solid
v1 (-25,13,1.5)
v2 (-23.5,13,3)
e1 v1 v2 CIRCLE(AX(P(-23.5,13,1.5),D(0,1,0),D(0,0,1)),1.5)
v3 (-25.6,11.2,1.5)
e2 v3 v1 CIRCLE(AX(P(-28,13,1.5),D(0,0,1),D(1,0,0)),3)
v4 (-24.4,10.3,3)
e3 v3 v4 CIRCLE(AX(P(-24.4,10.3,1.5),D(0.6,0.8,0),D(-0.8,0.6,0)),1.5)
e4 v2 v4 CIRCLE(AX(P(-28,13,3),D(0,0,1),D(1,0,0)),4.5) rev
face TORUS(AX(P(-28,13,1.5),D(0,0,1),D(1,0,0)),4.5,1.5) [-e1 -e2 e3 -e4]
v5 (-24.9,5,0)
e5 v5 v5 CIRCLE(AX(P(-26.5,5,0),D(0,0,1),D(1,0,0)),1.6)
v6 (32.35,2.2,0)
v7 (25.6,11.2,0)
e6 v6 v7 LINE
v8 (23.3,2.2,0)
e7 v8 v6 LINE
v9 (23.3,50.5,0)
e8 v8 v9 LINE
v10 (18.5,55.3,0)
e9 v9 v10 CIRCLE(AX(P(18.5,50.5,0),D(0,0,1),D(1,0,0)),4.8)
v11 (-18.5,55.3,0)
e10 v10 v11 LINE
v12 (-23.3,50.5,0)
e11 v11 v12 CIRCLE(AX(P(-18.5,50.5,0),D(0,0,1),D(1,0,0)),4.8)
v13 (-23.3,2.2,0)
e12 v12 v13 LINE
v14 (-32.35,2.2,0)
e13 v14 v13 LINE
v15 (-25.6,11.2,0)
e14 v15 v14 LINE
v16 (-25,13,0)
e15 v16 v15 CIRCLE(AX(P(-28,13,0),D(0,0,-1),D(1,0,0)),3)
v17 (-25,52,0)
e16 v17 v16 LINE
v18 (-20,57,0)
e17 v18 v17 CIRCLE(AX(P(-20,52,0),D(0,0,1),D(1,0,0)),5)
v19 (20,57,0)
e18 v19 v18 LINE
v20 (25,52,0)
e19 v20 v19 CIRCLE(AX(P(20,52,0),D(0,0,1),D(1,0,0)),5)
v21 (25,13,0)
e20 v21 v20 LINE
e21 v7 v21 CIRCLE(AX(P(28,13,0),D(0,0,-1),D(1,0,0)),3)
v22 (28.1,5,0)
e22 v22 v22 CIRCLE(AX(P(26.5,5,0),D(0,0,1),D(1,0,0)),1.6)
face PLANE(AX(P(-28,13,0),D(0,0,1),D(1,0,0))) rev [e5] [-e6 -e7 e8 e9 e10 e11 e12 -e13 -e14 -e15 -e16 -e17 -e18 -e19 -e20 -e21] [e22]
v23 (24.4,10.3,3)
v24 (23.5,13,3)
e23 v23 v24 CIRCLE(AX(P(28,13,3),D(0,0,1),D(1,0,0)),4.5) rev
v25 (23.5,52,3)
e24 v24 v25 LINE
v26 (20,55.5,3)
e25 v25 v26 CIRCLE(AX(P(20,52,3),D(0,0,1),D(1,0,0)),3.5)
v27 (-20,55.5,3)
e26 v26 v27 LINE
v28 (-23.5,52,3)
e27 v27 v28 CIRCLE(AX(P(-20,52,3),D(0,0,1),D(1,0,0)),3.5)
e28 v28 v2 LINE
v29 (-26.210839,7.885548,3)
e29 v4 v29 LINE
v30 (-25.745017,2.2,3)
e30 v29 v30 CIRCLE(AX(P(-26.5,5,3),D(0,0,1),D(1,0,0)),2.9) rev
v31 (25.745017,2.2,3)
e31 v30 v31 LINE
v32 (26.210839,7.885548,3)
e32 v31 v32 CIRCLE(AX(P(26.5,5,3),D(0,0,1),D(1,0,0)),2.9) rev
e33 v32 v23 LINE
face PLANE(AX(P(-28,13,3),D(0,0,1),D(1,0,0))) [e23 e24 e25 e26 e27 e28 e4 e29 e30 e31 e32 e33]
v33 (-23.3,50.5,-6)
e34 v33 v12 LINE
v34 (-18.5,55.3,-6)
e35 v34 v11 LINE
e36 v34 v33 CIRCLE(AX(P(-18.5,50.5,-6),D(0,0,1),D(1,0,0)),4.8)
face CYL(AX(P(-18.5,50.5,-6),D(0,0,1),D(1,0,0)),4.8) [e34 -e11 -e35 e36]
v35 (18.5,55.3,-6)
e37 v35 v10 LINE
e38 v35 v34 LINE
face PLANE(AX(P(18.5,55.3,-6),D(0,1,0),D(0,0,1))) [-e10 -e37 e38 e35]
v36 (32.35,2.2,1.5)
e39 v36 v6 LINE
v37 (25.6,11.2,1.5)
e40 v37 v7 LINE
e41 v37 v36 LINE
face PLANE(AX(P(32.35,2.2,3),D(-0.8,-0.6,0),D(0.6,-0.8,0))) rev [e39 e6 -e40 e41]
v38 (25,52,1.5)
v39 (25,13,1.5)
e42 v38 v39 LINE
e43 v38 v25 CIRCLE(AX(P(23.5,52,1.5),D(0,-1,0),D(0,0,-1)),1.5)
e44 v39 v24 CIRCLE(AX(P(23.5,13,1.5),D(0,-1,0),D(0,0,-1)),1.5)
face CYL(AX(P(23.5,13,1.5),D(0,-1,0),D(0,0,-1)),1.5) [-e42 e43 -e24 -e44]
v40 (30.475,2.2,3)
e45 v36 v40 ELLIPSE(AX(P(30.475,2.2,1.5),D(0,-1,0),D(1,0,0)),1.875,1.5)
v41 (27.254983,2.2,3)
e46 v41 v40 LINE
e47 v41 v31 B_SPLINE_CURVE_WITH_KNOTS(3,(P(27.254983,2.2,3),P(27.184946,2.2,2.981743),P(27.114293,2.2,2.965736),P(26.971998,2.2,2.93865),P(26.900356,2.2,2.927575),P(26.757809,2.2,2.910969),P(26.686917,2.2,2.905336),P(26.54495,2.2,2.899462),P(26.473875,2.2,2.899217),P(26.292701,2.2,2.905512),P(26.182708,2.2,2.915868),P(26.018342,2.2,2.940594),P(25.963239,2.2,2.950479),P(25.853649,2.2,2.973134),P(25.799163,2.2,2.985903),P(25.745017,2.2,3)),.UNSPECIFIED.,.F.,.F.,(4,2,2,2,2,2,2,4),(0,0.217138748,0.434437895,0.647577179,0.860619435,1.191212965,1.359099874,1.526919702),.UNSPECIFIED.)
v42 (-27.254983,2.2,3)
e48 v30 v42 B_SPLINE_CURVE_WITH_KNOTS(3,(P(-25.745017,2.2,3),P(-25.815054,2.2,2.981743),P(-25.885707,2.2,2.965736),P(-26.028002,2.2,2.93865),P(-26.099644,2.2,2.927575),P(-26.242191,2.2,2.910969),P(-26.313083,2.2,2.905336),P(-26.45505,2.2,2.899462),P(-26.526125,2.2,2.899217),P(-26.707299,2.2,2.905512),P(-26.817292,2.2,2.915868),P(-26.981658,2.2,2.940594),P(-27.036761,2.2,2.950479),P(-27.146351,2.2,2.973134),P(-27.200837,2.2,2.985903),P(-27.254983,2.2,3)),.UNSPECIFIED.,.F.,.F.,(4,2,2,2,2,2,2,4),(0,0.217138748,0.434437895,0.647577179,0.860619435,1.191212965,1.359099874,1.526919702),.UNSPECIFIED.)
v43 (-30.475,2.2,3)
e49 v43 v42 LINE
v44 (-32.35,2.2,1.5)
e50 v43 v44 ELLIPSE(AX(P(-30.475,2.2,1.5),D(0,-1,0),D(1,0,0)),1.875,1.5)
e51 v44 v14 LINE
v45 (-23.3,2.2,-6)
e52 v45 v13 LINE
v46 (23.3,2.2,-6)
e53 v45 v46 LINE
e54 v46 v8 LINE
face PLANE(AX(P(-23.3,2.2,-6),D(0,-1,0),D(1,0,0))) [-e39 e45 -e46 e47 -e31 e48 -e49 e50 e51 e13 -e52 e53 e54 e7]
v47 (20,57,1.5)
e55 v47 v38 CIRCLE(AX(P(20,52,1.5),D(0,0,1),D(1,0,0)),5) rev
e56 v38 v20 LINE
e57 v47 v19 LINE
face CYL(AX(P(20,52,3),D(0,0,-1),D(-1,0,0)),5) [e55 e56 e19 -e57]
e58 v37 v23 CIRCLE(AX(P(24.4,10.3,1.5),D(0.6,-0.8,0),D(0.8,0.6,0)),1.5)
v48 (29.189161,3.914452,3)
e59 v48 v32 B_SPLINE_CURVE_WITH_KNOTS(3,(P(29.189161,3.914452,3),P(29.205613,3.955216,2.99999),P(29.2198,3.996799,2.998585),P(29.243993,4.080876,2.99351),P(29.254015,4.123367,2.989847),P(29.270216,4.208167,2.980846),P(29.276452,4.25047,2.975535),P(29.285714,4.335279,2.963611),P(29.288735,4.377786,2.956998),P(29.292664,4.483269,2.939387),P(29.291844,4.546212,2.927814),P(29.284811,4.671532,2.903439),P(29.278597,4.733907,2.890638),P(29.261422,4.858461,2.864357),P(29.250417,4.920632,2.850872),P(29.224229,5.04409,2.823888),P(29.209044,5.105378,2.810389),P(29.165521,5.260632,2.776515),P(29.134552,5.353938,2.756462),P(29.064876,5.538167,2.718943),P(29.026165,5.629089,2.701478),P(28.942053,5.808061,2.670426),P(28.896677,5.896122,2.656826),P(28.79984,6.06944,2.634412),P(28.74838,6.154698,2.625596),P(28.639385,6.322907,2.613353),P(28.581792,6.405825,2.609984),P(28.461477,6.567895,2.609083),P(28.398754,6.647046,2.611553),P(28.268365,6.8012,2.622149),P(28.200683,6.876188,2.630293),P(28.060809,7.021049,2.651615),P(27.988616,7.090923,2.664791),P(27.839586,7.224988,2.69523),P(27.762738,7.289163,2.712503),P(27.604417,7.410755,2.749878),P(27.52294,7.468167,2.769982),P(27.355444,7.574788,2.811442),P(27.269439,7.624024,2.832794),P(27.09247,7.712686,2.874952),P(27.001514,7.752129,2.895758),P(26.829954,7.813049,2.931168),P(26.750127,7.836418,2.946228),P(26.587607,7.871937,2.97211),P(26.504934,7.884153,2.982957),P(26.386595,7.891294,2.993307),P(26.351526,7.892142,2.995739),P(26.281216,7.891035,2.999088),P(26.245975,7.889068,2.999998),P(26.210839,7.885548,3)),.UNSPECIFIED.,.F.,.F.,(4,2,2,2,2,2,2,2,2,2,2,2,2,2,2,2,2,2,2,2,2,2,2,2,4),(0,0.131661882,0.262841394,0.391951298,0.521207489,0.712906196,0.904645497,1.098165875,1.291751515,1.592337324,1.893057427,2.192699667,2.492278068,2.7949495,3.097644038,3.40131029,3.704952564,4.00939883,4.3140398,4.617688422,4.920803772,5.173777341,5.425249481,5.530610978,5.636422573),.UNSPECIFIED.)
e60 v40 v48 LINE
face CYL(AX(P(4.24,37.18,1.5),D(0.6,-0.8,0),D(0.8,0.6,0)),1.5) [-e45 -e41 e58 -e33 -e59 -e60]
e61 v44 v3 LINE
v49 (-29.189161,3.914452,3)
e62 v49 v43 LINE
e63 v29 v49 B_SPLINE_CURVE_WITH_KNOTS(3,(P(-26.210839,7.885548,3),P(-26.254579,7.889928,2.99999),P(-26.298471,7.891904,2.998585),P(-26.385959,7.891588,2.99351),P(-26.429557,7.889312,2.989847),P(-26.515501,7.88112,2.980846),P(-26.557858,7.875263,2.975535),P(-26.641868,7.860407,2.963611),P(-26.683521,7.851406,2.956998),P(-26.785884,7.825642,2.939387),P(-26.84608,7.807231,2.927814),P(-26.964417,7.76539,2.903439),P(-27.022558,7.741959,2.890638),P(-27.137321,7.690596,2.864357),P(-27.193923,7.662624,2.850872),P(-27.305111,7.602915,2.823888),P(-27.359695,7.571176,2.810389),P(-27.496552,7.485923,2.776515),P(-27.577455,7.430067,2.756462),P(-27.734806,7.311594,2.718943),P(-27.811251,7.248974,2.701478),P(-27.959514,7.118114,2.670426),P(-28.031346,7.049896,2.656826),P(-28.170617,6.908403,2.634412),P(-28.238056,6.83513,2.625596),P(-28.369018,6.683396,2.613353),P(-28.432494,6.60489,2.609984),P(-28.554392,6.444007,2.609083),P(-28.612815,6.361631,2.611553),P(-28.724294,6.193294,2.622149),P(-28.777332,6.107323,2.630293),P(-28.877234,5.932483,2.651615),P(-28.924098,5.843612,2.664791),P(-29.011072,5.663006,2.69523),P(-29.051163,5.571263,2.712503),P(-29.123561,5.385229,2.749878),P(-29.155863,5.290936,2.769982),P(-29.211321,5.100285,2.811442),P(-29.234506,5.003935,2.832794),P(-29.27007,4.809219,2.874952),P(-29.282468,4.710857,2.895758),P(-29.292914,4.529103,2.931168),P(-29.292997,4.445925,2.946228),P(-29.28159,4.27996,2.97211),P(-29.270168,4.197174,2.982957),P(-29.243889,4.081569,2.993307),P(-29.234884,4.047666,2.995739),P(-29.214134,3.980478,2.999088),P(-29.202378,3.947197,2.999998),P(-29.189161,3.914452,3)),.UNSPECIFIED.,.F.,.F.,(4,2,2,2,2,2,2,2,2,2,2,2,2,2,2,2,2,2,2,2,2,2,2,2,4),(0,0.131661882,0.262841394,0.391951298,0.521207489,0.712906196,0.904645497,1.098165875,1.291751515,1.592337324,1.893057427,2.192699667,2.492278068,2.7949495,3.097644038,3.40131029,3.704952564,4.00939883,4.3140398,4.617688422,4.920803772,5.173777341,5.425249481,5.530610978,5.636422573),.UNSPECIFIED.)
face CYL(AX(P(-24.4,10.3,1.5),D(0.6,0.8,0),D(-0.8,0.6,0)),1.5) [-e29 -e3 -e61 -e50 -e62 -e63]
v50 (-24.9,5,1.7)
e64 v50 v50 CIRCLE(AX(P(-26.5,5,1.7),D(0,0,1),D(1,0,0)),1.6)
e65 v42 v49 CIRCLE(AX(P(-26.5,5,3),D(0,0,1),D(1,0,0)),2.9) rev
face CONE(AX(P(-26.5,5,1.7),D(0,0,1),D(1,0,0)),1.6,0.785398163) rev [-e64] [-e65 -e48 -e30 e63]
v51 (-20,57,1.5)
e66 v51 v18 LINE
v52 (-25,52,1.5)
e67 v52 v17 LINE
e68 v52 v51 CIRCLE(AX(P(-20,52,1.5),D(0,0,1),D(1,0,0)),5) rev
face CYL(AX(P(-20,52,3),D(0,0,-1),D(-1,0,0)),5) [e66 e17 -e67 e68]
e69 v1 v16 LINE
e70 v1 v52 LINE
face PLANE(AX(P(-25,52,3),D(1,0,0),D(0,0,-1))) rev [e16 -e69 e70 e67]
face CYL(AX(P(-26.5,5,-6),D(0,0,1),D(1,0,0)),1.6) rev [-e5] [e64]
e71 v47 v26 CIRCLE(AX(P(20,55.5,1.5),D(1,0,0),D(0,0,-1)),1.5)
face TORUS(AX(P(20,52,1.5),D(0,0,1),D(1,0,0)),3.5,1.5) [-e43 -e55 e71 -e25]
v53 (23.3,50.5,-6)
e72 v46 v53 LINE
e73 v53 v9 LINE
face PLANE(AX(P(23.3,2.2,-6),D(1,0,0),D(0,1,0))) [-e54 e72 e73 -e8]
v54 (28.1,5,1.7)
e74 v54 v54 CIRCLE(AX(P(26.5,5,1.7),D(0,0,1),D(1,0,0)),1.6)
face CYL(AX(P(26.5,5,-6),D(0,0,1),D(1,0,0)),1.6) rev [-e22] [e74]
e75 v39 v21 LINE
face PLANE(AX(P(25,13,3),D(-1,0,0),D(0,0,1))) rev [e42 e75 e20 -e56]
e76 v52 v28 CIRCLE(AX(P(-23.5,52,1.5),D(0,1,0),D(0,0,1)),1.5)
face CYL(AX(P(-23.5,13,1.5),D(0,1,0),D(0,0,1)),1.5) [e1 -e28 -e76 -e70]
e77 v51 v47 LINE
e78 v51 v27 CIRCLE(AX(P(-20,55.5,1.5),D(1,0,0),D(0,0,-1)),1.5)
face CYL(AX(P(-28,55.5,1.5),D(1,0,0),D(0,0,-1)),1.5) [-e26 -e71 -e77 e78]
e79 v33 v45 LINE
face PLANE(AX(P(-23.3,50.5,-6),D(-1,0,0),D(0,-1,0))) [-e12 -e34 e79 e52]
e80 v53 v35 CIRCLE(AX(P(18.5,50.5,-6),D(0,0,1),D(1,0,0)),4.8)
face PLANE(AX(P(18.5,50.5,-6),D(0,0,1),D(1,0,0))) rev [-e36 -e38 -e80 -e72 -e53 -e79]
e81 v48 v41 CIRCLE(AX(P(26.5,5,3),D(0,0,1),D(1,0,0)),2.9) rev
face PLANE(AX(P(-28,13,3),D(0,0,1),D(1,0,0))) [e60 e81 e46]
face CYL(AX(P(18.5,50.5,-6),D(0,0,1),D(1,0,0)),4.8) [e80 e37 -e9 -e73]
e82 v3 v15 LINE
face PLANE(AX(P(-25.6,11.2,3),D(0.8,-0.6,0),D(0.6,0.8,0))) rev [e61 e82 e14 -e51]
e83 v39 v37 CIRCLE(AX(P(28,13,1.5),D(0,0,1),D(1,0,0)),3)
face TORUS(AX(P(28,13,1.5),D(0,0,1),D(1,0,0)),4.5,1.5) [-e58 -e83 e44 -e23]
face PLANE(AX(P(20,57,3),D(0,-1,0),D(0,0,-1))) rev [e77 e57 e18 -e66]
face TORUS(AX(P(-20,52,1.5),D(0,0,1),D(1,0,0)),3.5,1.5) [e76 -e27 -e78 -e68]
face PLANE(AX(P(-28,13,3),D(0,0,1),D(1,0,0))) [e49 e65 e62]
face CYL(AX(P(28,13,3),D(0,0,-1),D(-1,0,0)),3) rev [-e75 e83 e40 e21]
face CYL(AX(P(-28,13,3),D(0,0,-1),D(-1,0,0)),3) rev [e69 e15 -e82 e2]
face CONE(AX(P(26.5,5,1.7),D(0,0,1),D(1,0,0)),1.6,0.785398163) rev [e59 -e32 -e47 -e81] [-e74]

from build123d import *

# Parameters (mm, degrees)
BOSS_EXTRUDE1_DEPTH = 6
BOSS_EXTRUDE2_DEPTH = 3
SKETCH3_R           = 1.6
CUT_EXTRUDE1_DEPTH  = 67.155290794
CHAMFER1_SIZE       = 1.3
FILLET1_R           = 1.5


with BuildPart() as part:
    # Sketch1 → Boss-Extrude1 (new body)
    with BuildSketch(Plane.XY):
        with BuildLine():
            Line((-23.3, 50.5), (-23.3, 2.2))
            Line((-23.3, 2.2), (23.3, 2.2))
            Line((23.3, 2.2), (23.3, 50.5))
            ThreePointArc((23.3, 50.5), (21.89411255, 53.89411255), (18.5, 55.3))
            Line((18.5, 55.3), (-18.5, 55.3))
            ThreePointArc((-18.5, 55.3), (-21.89411255, 53.89411255), (-23.3, 50.5))
        make_face()
    extrude(amount=-BOSS_EXTRUDE1_DEPTH)

    # Sketch2 → Boss-Extrude2 (add)
    with BuildSketch(Plane.XY):
        with BuildLine():
            Line((-25.6, 11.2), (-32.35, 2.2))
            Line((-32.35, 2.2), (-23.3, 2.2))
            Line((-23.3, 2.2), (23.3, 2.2))
            Line((23.3, 2.2), (32.35, 2.2))
            Line((32.35, 2.2), (25.6, 11.2))
            ThreePointArc((25.6, 11.2), (25.153950106, 12.051316702), (25, 13))
            Line((25, 13), (25, 52))
            ThreePointArc((25, 52), (23.535533906, 55.535533906), (20, 57))
            Line((20, 57), (-20, 57))
            ThreePointArc((-20, 57), (-23.535533906, 55.535533906), (-25, 52))
            Line((-25, 52), (-25, 13))
            ThreePointArc((-25, 13), (-25.153950106, 12.051316702), (-25.6, 11.2))
        make_face()
    extrude(amount=BOSS_EXTRUDE2_DEPTH)

    # Sketch3 → Cut-Extrude1 (cut, through all)
    with BuildSketch(Plane.XY.offset(3)):
        with Locations((-26.5, 5)):
            Circle(SKETCH3_R)
        with Locations((26.5, 5)):
            Circle(SKETCH3_R)
    extrude(amount=-CUT_EXTRUDE1_DEPTH, mode=Mode.SUBTRACT)

    # Chamfer1
    # the kernel refuses this chamfer: 1.3 mm, written as the material it takes off along each edge
    with BuildSketch(Plane(origin=(-26.5, 5, 3), x_dir=(1, 0, 0), z_dir=(0, -1, 0))) as chamfer1_piece_1:
        Polygon((1.6 + CHAMFER1_SIZE, 0), (1.6, -CHAMFER1_SIZE), (1.6, 0), align=None)
    revolve(axis=Axis((-26.5, 5, 3), (0, 0, 1)), mode=Mode.SUBTRACT)
    with BuildSketch(Plane(origin=(26.5, 5, 3), x_dir=(1, 0, 0), z_dir=(0, -1, 0))) as chamfer1_piece_2:
        Polygon((1.6 + CHAMFER1_SIZE, 0), (1.6, -CHAMFER1_SIZE), (1.6, 0), align=None)
    revolve(axis=Axis((26.5, 5, 3), (0, 0, 1)), mode=Mode.SUBTRACT)

    # Fillet1
    # the kernel refuses this fillet: 1.5 mm, written as the material it takes off along each edge
    with BuildSketch(Plane(origin=(-28, 13, 3), x_dir=(1, 0, 0), z_dir=(0, 1, 0))) as fillet1_piece_1:
        with BuildLine():
            CenterArc((3 + FILLET1_R, FILLET1_R), FILLET1_R, 180, 90)
            Line((3 + FILLET1_R, 0), (3, 0))
            Line((3, 0), (3, FILLET1_R))
        make_face()
    revolve(axis=Axis((-28, 13, 3), (0, 0, -1)), revolution_arc=36.869897646, mode=Mode.SUBTRACT)
    with BuildSketch(Plane(origin=(-25.6, 11.2, 3), x_dir=(0, 0, -1), z_dir=(-0.6000000000000002, -0.7999999999999998, 0))) as fillet1_piece_2:
        with BuildLine():
            CenterArc((FILLET1_R, FILLET1_R), FILLET1_R, 180, 90)
            Line((0, FILLET1_R), (0, 0))
            Line((0, 0), (FILLET1_R, 0))
        make_face()
    extrude(amount=15, mode=Mode.SUBTRACT)
    with BuildSketch(Plane(origin=(34.6, -0.8, 3), x_dir=(-0.800000000000001, -0.5999999999999985, 0), z_dir=(-0.5999999999999985, 0.8000000000000012, 0))) as fillet1_piece_3:
        with BuildLine():
            CenterArc((FILLET1_R, -FILLET1_R), FILLET1_R, 90, 90)
            Line((0, -FILLET1_R), (0, 0))
            Line((0, 0), (FILLET1_R, 0))
        make_face()
    extrude(amount=15, mode=Mode.SUBTRACT)
    with BuildSketch(Plane(origin=(28, 13, 3), x_dir=(-0.8000000000000014, -0.5999999999999981, 0), z_dir=(0.5999999999999981, -0.8000000000000014, 0))) as fillet1_piece_4:
        with BuildLine():
            CenterArc((3 + FILLET1_R, FILLET1_R), FILLET1_R, 180, 90)
            Line((3, FILLET1_R), (3, 0))
            Line((3, 0), (3 + FILLET1_R, 0))
        make_face()
    revolve(axis=Axis((28, 13, 3), (0, 0, -1)), revolution_arc=36.869897646, mode=Mode.SUBTRACT)
    with BuildSketch(Plane(origin=(25, 13, 3), x_dir=(-1, 0, 0), z_dir=(0, 1, 0)), Plane(origin=(-25, 52, 3), x_dir=(1, 0, 0), z_dir=(0, -1, 0))) as fillet1_piece_5:
        with BuildLine():
            CenterArc((FILLET1_R, -FILLET1_R), FILLET1_R, 90, 90)
            Line((0, -FILLET1_R), (0, 0))
            Line((0, 0), (FILLET1_R, 0))
        make_face()
    extrude(amount=39, mode=Mode.SUBTRACT)
    with BuildSketch(Plane(origin=(20, 52, 3), x_dir=(1, 0, 0), z_dir=(0, -1, 0))) as fillet1_piece_6:
        with BuildLine():
            CenterArc((5 - FILLET1_R, -FILLET1_R), FILLET1_R, 0, 90)
            Line((5, -FILLET1_R), (5, 0))
            Line((5, 0), (5 - FILLET1_R, 0))
        make_face()
    revolve(axis=Axis((20, 52, 3), (0, 0, 1)), revolution_arc=90, mode=Mode.SUBTRACT)
    with BuildSketch(Plane(origin=(20, 57, 3), x_dir=(0, -1, 0), z_dir=(-1, 0, 0))) as fillet1_piece_7:
        with BuildLine():
            CenterArc((FILLET1_R, -FILLET1_R), FILLET1_R, 90, 90)
            Line((0, -FILLET1_R), (0, 0))
            Line((0, 0), (FILLET1_R, 0))
        make_face()
    extrude(amount=40, mode=Mode.SUBTRACT)
    with BuildSketch(Plane(origin=(-20, 52, 3), x_dir=(0, 1, 0), z_dir=(1, 0, 0))) as fillet1_piece_8:
        with BuildLine():
            CenterArc((5 - FILLET1_R, -FILLET1_R), FILLET1_R, 0, 90)
            Line((5, -FILLET1_R), (5, 0))
            Line((5, 0), (5 - FILLET1_R, 0))
        make_face()
    revolve(axis=Axis((-20, 52, 3), (0, 0, 1)), revolution_arc=90, mode=Mode.SUBTRACT)


solid = part.part
